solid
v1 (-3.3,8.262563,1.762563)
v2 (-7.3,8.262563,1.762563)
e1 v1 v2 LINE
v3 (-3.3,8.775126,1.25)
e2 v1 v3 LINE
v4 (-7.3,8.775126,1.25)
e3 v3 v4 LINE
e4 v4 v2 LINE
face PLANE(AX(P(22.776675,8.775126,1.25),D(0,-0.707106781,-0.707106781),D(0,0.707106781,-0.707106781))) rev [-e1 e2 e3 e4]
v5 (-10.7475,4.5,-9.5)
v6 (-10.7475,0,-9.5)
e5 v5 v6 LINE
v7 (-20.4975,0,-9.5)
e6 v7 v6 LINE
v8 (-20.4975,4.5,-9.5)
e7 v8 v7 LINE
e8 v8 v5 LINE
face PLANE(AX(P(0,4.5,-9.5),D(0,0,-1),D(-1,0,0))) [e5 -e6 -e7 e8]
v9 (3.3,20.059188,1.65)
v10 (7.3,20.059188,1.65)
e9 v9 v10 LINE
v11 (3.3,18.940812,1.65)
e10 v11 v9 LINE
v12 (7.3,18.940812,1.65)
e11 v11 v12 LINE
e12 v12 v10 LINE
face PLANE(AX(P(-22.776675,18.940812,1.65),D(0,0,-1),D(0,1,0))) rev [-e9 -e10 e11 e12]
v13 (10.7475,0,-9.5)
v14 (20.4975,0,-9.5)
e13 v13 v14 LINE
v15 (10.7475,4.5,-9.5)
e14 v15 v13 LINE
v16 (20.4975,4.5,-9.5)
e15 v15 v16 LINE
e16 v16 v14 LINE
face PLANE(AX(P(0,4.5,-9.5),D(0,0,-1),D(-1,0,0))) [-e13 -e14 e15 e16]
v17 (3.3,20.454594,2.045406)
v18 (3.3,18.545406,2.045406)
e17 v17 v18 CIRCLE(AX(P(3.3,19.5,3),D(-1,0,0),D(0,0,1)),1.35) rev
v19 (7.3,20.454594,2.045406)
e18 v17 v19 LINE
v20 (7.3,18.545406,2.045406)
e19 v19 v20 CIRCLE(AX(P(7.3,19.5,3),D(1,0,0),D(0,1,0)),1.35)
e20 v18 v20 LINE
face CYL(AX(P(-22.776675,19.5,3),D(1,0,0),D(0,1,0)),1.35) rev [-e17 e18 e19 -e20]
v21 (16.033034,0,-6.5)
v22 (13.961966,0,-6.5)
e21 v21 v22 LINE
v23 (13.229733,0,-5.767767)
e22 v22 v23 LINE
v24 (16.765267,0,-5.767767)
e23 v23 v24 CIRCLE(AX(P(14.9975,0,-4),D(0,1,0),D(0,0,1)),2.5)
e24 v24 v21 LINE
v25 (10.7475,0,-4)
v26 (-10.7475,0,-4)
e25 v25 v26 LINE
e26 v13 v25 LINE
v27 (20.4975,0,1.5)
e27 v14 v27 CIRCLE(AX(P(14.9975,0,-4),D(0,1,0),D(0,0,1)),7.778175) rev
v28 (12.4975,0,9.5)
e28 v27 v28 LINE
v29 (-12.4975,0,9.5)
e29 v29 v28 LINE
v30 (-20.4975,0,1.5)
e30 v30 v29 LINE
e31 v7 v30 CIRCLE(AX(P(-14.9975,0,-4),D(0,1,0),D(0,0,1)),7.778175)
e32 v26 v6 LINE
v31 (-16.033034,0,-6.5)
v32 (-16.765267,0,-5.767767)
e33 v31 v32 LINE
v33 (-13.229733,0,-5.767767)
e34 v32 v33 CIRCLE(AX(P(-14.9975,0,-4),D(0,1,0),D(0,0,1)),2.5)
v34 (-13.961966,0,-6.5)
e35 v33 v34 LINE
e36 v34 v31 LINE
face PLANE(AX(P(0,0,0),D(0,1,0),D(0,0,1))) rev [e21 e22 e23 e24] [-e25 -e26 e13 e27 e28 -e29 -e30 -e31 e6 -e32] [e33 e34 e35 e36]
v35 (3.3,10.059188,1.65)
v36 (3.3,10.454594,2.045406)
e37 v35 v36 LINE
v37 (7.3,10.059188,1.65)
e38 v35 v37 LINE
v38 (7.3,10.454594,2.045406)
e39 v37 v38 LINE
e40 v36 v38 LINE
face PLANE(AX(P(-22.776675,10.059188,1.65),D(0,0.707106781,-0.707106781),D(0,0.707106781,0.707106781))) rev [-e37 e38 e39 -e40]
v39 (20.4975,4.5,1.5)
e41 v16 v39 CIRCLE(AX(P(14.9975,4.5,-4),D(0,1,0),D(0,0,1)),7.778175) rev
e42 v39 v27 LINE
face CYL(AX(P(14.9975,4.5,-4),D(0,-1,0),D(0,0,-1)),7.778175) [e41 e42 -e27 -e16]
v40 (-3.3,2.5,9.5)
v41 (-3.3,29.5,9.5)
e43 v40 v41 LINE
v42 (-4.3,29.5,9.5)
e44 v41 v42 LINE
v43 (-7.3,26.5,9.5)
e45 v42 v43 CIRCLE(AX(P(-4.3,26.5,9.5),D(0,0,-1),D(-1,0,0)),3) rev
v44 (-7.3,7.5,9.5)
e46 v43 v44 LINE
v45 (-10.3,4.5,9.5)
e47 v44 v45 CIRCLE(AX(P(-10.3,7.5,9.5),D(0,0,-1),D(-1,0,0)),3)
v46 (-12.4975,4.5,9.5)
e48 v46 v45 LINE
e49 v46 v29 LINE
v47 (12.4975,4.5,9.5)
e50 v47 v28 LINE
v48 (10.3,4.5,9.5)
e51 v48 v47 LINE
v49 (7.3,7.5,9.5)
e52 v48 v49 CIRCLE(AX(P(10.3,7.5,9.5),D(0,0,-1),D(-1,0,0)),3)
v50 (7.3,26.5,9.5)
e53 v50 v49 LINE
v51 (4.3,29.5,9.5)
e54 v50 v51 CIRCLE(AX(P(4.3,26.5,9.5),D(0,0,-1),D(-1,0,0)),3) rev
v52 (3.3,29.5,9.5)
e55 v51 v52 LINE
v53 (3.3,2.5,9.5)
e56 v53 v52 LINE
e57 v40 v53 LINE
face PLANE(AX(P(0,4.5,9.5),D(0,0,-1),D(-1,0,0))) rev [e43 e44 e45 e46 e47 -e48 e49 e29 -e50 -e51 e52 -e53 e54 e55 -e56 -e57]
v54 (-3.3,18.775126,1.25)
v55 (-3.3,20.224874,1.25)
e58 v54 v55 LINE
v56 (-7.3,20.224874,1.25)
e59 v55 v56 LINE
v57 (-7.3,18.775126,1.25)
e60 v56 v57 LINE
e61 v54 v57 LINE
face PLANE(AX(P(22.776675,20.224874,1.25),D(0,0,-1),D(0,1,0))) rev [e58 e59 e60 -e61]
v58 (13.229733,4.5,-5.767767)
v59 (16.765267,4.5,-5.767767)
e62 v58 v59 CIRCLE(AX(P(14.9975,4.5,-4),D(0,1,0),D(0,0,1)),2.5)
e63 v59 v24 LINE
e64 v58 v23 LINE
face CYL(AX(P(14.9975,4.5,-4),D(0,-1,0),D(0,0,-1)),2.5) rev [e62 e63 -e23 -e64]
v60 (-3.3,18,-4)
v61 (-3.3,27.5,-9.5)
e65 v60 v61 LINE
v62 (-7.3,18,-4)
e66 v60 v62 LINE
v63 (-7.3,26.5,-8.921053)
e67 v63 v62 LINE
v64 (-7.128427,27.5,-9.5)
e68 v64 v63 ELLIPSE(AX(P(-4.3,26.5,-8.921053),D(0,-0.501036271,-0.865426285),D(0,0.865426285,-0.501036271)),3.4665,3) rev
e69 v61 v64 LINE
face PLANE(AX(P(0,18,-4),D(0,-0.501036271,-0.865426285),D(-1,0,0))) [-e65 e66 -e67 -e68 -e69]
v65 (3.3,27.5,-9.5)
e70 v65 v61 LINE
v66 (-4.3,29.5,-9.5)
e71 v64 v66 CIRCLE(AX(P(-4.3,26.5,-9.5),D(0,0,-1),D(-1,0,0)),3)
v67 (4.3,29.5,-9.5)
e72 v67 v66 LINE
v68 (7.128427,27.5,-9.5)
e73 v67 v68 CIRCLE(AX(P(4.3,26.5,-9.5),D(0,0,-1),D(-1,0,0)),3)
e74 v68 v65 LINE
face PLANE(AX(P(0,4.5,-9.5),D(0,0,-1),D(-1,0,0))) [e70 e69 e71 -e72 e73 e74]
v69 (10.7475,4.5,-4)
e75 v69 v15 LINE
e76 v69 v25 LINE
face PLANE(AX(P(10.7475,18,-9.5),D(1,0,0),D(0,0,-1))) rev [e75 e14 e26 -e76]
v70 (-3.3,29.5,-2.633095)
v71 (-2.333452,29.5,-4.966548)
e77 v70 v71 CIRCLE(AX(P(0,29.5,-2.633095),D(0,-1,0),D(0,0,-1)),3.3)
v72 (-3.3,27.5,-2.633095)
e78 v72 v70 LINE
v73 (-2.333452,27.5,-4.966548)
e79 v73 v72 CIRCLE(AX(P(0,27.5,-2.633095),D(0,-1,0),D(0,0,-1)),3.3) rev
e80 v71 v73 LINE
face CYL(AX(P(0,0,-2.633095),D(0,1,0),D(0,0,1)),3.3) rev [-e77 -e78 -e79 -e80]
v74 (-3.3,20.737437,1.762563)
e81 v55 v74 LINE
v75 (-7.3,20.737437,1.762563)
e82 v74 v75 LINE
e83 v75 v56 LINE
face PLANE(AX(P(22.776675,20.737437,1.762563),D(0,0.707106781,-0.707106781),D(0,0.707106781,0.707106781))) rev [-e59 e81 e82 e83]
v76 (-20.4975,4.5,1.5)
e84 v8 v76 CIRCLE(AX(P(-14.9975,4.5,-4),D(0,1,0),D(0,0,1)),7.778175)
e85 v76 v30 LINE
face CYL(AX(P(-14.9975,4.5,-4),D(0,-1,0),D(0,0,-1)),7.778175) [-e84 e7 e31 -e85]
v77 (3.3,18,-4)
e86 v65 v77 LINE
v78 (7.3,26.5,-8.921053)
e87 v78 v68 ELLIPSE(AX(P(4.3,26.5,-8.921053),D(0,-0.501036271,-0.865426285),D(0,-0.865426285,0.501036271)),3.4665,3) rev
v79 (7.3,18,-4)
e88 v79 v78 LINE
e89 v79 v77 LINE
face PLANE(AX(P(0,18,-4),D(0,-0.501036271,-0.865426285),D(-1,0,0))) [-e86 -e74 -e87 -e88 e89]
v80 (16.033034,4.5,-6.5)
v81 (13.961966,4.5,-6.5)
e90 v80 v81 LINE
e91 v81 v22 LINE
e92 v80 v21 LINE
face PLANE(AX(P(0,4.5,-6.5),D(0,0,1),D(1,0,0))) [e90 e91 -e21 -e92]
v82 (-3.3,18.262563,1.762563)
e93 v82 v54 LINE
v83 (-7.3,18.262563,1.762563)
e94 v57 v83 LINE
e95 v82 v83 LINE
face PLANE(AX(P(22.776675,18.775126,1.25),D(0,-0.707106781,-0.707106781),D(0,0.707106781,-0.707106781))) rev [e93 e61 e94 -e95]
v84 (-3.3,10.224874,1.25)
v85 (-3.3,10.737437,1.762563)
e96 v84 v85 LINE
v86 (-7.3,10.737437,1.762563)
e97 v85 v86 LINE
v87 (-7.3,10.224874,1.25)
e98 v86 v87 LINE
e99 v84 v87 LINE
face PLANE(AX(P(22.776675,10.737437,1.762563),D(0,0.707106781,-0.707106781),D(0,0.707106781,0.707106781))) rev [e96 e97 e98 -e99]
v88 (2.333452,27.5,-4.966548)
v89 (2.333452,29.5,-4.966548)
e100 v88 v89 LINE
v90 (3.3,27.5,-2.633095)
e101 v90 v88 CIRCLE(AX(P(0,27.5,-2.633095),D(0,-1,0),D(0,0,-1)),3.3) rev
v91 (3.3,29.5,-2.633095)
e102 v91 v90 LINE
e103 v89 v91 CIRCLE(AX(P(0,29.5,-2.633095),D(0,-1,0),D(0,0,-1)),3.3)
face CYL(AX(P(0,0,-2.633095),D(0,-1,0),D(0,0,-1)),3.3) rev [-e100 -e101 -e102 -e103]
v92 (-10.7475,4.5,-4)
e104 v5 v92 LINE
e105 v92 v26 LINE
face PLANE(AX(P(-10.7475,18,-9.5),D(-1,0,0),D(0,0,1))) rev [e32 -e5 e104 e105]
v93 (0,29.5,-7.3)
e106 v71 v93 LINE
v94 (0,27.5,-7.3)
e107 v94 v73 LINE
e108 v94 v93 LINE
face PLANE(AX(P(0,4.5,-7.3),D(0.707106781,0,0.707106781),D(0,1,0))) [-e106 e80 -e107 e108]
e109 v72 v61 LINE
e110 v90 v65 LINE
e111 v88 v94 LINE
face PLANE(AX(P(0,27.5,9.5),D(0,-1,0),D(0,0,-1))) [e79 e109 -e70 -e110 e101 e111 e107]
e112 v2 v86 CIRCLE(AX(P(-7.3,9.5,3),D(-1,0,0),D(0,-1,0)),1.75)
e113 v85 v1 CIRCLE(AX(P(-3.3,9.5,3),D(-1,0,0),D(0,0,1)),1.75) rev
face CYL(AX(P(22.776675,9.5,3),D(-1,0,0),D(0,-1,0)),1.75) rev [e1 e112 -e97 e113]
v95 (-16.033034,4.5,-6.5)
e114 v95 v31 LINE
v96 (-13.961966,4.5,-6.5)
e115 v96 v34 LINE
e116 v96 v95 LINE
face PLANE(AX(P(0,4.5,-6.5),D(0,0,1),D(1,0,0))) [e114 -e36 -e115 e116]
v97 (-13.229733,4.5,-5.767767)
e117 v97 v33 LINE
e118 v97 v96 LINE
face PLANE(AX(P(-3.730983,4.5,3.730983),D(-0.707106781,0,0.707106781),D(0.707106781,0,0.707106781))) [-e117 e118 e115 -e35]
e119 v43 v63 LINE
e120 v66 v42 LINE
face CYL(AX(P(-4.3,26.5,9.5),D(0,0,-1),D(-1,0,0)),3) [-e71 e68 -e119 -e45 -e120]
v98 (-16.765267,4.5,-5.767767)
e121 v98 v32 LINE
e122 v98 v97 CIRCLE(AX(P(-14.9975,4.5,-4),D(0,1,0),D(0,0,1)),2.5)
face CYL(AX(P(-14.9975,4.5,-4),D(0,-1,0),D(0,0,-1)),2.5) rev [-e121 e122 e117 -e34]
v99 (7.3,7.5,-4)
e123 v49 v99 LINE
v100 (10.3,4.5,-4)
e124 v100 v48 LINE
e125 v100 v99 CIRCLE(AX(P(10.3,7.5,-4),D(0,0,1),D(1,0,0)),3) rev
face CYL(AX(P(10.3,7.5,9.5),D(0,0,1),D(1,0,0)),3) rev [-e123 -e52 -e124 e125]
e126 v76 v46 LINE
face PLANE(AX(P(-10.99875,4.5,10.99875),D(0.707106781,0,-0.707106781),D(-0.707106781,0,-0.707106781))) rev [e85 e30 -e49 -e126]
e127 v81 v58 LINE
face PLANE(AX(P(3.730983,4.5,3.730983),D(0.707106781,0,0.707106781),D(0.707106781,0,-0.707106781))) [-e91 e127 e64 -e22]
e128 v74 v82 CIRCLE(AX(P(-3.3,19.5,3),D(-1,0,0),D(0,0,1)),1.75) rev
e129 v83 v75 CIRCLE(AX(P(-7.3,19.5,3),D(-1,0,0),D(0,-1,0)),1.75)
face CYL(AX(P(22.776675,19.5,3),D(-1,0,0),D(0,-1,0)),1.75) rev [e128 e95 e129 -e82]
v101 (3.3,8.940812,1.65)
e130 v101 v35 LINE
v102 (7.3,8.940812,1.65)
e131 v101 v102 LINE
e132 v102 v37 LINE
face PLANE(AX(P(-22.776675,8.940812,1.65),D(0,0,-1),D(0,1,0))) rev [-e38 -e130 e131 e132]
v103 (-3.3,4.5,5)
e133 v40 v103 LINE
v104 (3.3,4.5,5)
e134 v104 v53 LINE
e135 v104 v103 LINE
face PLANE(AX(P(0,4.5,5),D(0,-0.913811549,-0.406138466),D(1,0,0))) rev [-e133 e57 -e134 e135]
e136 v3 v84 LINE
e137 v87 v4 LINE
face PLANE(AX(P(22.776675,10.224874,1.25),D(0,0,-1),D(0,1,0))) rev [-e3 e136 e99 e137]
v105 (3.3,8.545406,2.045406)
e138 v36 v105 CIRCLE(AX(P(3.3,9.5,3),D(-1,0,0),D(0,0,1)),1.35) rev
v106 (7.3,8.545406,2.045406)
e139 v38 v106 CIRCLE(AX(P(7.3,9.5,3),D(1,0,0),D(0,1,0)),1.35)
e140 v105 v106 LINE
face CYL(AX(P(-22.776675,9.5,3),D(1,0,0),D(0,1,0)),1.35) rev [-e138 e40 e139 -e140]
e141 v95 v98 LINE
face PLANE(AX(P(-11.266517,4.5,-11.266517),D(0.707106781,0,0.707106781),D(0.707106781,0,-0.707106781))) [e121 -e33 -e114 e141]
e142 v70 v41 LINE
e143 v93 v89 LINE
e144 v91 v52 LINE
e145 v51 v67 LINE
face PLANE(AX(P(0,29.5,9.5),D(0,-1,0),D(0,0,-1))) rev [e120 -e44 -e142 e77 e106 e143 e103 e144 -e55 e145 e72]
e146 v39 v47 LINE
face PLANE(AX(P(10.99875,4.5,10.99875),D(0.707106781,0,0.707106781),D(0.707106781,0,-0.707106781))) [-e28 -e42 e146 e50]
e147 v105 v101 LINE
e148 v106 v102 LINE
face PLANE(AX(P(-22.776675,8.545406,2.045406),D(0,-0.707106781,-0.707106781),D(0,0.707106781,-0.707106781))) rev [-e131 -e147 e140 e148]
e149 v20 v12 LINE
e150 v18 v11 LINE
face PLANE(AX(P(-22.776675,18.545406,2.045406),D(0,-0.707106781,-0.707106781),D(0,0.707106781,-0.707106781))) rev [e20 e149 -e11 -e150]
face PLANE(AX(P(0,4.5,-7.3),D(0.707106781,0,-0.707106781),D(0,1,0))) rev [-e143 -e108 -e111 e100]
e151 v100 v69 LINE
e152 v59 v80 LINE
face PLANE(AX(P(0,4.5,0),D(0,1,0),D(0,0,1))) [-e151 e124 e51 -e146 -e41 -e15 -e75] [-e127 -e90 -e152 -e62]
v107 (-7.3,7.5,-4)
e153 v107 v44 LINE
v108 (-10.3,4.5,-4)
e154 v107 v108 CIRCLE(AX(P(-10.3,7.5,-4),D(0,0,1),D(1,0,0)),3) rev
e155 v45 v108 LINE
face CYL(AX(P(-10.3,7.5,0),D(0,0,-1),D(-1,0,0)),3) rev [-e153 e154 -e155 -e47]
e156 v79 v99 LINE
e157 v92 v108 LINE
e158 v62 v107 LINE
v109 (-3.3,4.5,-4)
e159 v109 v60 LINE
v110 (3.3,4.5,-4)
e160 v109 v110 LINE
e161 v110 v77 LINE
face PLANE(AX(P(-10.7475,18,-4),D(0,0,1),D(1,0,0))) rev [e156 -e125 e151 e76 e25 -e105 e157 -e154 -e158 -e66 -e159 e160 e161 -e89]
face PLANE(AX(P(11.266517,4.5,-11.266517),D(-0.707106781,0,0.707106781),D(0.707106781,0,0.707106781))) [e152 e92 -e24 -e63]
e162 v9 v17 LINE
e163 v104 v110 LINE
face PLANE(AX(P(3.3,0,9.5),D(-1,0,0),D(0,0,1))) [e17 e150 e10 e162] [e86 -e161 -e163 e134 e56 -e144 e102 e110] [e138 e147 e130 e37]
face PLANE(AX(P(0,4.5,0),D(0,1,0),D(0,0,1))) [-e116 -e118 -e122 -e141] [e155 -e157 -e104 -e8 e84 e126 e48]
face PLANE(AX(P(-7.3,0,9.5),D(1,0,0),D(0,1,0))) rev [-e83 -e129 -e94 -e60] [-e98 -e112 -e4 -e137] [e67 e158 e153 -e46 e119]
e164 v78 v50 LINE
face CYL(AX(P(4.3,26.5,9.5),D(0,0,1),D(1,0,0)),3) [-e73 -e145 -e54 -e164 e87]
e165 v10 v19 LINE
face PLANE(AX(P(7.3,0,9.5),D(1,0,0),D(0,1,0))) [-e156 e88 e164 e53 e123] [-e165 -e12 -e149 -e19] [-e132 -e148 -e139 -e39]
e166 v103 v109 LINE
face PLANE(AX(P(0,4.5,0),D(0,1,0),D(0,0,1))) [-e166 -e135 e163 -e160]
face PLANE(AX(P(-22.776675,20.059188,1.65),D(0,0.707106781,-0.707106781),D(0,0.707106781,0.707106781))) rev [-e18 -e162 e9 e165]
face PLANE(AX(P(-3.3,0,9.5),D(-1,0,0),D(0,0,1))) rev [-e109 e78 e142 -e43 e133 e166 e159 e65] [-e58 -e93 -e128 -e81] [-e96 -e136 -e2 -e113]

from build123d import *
from OCP.BRepFilletAPI import BRepFilletAPI_MakeChamfer

# Parameters (mm, degrees)
BOSS_EXTRUDE1_DEPTH = 4.5
BOSS_EXTRUDE2_DEPTH = 19
SKETCH4_W           = 6.6
SKETCH4_H           = 4.8
BOSS_EXTRUDE4_DEPTH = 2
SKETCH5_W           = 6.6
SKETCH5_H           = 2
CUT_EXTRUDE1_DEPTH  = 4.5
CUT_EXTRUDE2_REACH  = 45.186
CUT_EXTRUDE4_REACH  = 45.186
SKETCH9_W           = 6.6
SKETCH9_H           = 2
CUT_EXTRUDE5_DEPTH  = 16.8
FILLET3_R           = 3
SKETCH12_W          = 21.495
SKETCH12_H          = 5.5
CUT_EXTRUDE8_DEPTH  = 18
FILLET7_R           = 3
CHAMFER2_SIZE2      = 2
CHAMFER2_SIZE       = 4.5
CHAMFER3_SIZE       = 3.3
FILLET8_R           = 3.3
CHAMFER4_SIZE       = 9.5
CHAMFER4_SIZE_2     = 5.5


with BuildPart() as part:
    # Sketch1 → Boss-Extrude1 (new body)
    with BuildSketch(Plane(origin=(0, 0, 0), x_dir=(1, 0, 0), z_dir=(0, 1, 0))):
        with BuildLine():
            Line((-20.4975, -1.5), (-12.4975, -9.5))
            Line((-12.4975, -9.5), (12.4975, -9.5))
            Line((12.4975, -9.5), (20.4975, -1.5))
            ThreePointArc((20.4975, -1.5), (22.775674593, 4), (20.4975, 9.5))
            Line((20.4975, 9.5), (-20.4975, 9.5))
            ThreePointArc((-20.4975, 9.5), (-22.775674593, 4), (-20.4975, -1.5))
        make_face()
        with BuildLine():
            Line((-16.765266953, 5.767766953), (-16.033033906, 6.5))
            Line((-16.033033906, 6.5), (-13.961966094, 6.5))
            Line((-13.961966094, 6.5), (-13.229733047, 5.767766953))
            ThreePointArc((-13.229733047, 5.767766953), (-13.229733045, 2.232233049), (-16.765266949, 2.232233043))
            ThreePointArc((-16.765266949, 2.232233043), (-17.30719883, 3.043291416), (-17.4975, 4))
            ThreePointArc((-17.4975, 4), (-17.307198831, 4.956708581), (-16.765266953, 5.767766953))
        make_face(mode=Mode.SUBTRACT)
        with BuildLine():
            Line((13.229733047, 5.767766953), (13.961966094, 6.5))
            Line((13.961966094, 6.5), (16.033033906, 6.5))
            Line((16.033033906, 6.5), (16.765266953, 5.767766953))
            ThreePointArc((16.765266953, 5.767766953), (16.765266949, 2.232233043), (13.229733038, 2.232233056))
            ThreePointArc((13.229733038, 2.232233056), (12.4975, 4.000000006), (13.229733047, 5.767766953))
        make_face(mode=Mode.SUBTRACT)
    extrude(amount=BOSS_EXTRUDE1_DEPTH)

    # Sketch2 → Boss-Extrude2 (add, through all)
    with BuildSketch(Plane(origin=(0, 0, -9.5), x_dir=(-1, 0, 0), z_dir=(0, 0, -1))):
        Polygon((-7.3, 4.5), (-3.3, 4.5), (-3.3, 27.5), (3.3, 27.5), (3.3, 4.5), (7.3, 4.5), (7.3, 29.5), (-7.3, 29.5), align=None)
    extrude(amount=-BOSS_EXTRUDE2_DEPTH)

    # Sketch4 → Boss-Extrude4 (add)
    with BuildSketch(Plane(origin=(0, 4.5, 0), x_dir=(1, 0, 0), z_dir=(0, 1, 0))):
        with Locations((0, 7.1)):
            Rectangle(SKETCH4_W, SKETCH4_H)
    extrude(amount=BOSS_EXTRUDE4_DEPTH)

    # Sketch5 → Cut-Extrude1 (cut)
    with BuildSketch(Plane.XY.offset(9.5)):
        with Locations((0, 3.5)):
            Rectangle(SKETCH5_W, SKETCH5_H)
    extrude(amount=-CUT_EXTRUDE1_DEPTH, mode=Mode.SUBTRACT)

    # Sketch6 → Cut-Extrude2 (cut, up to next)
    with BuildSketch(Plane(origin=(7.3, 0, 0), x_dir=(0, 0, -1), z_dir=(1, 0, 0)), mode=Mode.PRIVATE) as cut_extrude2_sk1:
        with BuildLine():
            Line((-1.65, 20.059188309), (-2.045405845, 20.454594155))
            ThreePointArc((-2.045405845, 20.454594155), (-4.35, 19.5), (-2.045405845, 18.545405845))
            Line((-2.045405845, 18.545405845), (-1.65, 18.940811691))
            Line((-1.65, 18.940811691), (-1.65, 20.059188309))
        make_face()
    cut_extrude2_tool1 = extrude(cut_extrude2_sk1.sketch, amount=-CUT_EXTRUDE2_REACH, mode=Mode.PRIVATE) & part.part
    # Sketch6 → Cut-Extrude2 (cut, up to next)
    with BuildSketch(Plane(origin=(7.3, 0, 0), x_dir=(0, 0, -1), z_dir=(1, 0, 0)), mode=Mode.PRIVATE) as cut_extrude2_sk2:
        with BuildLine():
            Line((-1.65, 10.059188309), (-2.045405845, 10.454594155))
            ThreePointArc((-2.045405845, 10.454594155), (-4.35, 9.5), (-2.045405845, 8.545405845))
            Line((-2.045405845, 8.545405845), (-1.65, 8.940811691))
            Line((-1.65, 8.940811691), (-1.65, 10.059188309))
        make_face()
    cut_extrude2_tool2 = extrude(cut_extrude2_sk2.sketch, amount=-CUT_EXTRUDE2_REACH, mode=Mode.PRIVATE) & part.part
    add(cut_extrude2_tool1.solids().sort_by_distance((7.3, 19.5, 2.982857))[0], mode=Mode.SUBTRACT)
    add(cut_extrude2_tool2.solids().sort_by_distance((7.3, 9.5, 2.982857))[0], mode=Mode.SUBTRACT)

    # Sketch8 → Cut-Extrude4 (cut, up to next)
    with BuildSketch(Plane.ZY.offset(7.3), mode=Mode.PRIVATE) as cut_extrude4_sk1:
        with BuildLine():
            Line((1.25, 10.224873734), (1.25, 8.775126266))
            Line((1.25, 8.775126266), (1.762563133, 8.262563133))
            ThreePointArc((1.762563133, 8.262563133), (4.75, 9.5), (1.762563133, 10.737436867))
            Line((1.762563133, 10.737436867), (1.25, 10.224873734))
        make_face()
    cut_extrude4_tool1 = extrude(cut_extrude4_sk1.sketch, amount=-CUT_EXTRUDE4_REACH, mode=Mode.PRIVATE) & part.part
    # Sketch8 → Cut-Extrude4 (cut, up to next)
    with BuildSketch(Plane.ZY.offset(7.3), mode=Mode.PRIVATE) as cut_extrude4_sk2:
        with BuildLine():
            Line((1.25, 20.224873734), (1.25, 18.775126266))
            Line((1.25, 18.775126266), (1.762563133, 18.262563133))
            ThreePointArc((1.762563133, 18.262563133), (4.75, 19.5), (1.762563133, 20.737436867))
            Line((1.762563133, 20.737436867), (1.25, 20.224873734))
        make_face()
    cut_extrude4_tool2 = extrude(cut_extrude4_sk2.sketch, amount=-CUT_EXTRUDE4_REACH, mode=Mode.PRIVATE) & part.part
    add(cut_extrude4_tool1.solids().sort_by_distance((-7.3, 9.5, 2.977778))[0], mode=Mode.SUBTRACT)
    add(cut_extrude4_tool2.solids().sort_by_distance((-7.3, 19.5, 2.977778))[0], mode=Mode.SUBTRACT)

    # Sketch9 → Cut-Extrude5 (cut)
    with BuildSketch(Plane.XY.offset(9.5)):
        with Locations((0, 28.5)):
            Rectangle(SKETCH9_W, SKETCH9_H)
    extrude(amount=-CUT_EXTRUDE5_DEPTH, mode=Mode.SUBTRACT)

    # Fillet3
    fillet3_edges = [part.edges().sort_by_distance(p)[0] for p in [
        (-7.3, 4.5, 0),
        (7.3, 4.5, 0),
    ]]
    fillet(fillet3_edges, radius=FILLET3_R)

    # Sketch12 → Cut-Extrude8 (cut)
    with BuildSketch(Plane.XZ):
        with Locations((0, -6.75)):
            Rectangle(SKETCH12_W, SKETCH12_H)
    extrude(amount=-CUT_EXTRUDE8_DEPTH, mode=Mode.SUBTRACT)

    # Fillet7
    fillet7_edges = [part.edges().sort_by_distance(p)[0] for p in [
        (-7.3, 29.5, 0),
        (7.3, 29.5, 0),
    ]]
    fillet(fillet7_edges, radius=FILLET7_R)

    # Chamfer2
    chamfer2_edges = [part.edges().sort_by_distance(p)[0] for p in [
        (0, 2.5, 5),
    ]]
    chamfer2_side = [part.faces().sort_by_distance(p)[0] for p in [
        (0, 2.5, 5.04),
    ]]
    chamfer(chamfer2_edges, length=CHAMFER2_SIZE - 0.0001, length2=CHAMFER2_SIZE2 - 0.0001, reference=chamfer2_side[0])  # a hair under: the kernel refuses the full size

    # Chamfer3
    chamfer3_edges = [part.edges().sort_by_distance(p)[0] for p in [
        (-3.3, 28.5, -7.3),
        (3.3, 28.5, -7.3),
    ]]
    chamfer(chamfer3_edges, length=CHAMFER3_SIZE - 0.0001)  # a hair under: the kernel refuses the full size

    # Fillet8
    fillet8_edges = [part.edges().sort_by_distance(p)[0] for p in [
        (-3.3, 28.5, -4.0001),
        (3.3, 28.5, -4.0001),
    ]]
    fillet(fillet8_edges, radius=FILLET8_R)

    # Chamfer4
    chamfer4_edges_1 = [part.edges().sort_by_distance(p)[0] for p in [
        (-5.3, 18, -9.5),
    ]]
    chamfer4_side_1 = [part.faces().sort_by_distance(p)[0] for p in [
        (-5.3, 18.11, -9.5),
    ]]
    chamfer4_edges_2 = [part.edges().sort_by_distance(p)[0] for p in [
        (5.3, 18, -9.5),
    ]]
    chamfer4_side_2 = [part.faces().sort_by_distance(p)[0] for p in [
        (5.3, 18, -9.39),
    ]]
    chamfer4 = BRepFilletAPI_MakeChamfer(part.part.solid().wrapped)
    for e in chamfer4_edges_1:
        chamfer4.Add(CHAMFER4_SIZE - 0.0001, CHAMFER4_SIZE_2 - 0.0001, e.wrapped, chamfer4_side_1[0].wrapped)
    for e in chamfer4_edges_2:
        chamfer4.Add(CHAMFER4_SIZE_2 - 0.0001, CHAMFER4_SIZE - 0.0001, e.wrapped, chamfer4_side_2[0].wrapped)
    add(Compound.cast(chamfer4.Shape()), mode=Mode.REPLACE)  # a hair under: the kernel refuses the full size


solid = part.part
